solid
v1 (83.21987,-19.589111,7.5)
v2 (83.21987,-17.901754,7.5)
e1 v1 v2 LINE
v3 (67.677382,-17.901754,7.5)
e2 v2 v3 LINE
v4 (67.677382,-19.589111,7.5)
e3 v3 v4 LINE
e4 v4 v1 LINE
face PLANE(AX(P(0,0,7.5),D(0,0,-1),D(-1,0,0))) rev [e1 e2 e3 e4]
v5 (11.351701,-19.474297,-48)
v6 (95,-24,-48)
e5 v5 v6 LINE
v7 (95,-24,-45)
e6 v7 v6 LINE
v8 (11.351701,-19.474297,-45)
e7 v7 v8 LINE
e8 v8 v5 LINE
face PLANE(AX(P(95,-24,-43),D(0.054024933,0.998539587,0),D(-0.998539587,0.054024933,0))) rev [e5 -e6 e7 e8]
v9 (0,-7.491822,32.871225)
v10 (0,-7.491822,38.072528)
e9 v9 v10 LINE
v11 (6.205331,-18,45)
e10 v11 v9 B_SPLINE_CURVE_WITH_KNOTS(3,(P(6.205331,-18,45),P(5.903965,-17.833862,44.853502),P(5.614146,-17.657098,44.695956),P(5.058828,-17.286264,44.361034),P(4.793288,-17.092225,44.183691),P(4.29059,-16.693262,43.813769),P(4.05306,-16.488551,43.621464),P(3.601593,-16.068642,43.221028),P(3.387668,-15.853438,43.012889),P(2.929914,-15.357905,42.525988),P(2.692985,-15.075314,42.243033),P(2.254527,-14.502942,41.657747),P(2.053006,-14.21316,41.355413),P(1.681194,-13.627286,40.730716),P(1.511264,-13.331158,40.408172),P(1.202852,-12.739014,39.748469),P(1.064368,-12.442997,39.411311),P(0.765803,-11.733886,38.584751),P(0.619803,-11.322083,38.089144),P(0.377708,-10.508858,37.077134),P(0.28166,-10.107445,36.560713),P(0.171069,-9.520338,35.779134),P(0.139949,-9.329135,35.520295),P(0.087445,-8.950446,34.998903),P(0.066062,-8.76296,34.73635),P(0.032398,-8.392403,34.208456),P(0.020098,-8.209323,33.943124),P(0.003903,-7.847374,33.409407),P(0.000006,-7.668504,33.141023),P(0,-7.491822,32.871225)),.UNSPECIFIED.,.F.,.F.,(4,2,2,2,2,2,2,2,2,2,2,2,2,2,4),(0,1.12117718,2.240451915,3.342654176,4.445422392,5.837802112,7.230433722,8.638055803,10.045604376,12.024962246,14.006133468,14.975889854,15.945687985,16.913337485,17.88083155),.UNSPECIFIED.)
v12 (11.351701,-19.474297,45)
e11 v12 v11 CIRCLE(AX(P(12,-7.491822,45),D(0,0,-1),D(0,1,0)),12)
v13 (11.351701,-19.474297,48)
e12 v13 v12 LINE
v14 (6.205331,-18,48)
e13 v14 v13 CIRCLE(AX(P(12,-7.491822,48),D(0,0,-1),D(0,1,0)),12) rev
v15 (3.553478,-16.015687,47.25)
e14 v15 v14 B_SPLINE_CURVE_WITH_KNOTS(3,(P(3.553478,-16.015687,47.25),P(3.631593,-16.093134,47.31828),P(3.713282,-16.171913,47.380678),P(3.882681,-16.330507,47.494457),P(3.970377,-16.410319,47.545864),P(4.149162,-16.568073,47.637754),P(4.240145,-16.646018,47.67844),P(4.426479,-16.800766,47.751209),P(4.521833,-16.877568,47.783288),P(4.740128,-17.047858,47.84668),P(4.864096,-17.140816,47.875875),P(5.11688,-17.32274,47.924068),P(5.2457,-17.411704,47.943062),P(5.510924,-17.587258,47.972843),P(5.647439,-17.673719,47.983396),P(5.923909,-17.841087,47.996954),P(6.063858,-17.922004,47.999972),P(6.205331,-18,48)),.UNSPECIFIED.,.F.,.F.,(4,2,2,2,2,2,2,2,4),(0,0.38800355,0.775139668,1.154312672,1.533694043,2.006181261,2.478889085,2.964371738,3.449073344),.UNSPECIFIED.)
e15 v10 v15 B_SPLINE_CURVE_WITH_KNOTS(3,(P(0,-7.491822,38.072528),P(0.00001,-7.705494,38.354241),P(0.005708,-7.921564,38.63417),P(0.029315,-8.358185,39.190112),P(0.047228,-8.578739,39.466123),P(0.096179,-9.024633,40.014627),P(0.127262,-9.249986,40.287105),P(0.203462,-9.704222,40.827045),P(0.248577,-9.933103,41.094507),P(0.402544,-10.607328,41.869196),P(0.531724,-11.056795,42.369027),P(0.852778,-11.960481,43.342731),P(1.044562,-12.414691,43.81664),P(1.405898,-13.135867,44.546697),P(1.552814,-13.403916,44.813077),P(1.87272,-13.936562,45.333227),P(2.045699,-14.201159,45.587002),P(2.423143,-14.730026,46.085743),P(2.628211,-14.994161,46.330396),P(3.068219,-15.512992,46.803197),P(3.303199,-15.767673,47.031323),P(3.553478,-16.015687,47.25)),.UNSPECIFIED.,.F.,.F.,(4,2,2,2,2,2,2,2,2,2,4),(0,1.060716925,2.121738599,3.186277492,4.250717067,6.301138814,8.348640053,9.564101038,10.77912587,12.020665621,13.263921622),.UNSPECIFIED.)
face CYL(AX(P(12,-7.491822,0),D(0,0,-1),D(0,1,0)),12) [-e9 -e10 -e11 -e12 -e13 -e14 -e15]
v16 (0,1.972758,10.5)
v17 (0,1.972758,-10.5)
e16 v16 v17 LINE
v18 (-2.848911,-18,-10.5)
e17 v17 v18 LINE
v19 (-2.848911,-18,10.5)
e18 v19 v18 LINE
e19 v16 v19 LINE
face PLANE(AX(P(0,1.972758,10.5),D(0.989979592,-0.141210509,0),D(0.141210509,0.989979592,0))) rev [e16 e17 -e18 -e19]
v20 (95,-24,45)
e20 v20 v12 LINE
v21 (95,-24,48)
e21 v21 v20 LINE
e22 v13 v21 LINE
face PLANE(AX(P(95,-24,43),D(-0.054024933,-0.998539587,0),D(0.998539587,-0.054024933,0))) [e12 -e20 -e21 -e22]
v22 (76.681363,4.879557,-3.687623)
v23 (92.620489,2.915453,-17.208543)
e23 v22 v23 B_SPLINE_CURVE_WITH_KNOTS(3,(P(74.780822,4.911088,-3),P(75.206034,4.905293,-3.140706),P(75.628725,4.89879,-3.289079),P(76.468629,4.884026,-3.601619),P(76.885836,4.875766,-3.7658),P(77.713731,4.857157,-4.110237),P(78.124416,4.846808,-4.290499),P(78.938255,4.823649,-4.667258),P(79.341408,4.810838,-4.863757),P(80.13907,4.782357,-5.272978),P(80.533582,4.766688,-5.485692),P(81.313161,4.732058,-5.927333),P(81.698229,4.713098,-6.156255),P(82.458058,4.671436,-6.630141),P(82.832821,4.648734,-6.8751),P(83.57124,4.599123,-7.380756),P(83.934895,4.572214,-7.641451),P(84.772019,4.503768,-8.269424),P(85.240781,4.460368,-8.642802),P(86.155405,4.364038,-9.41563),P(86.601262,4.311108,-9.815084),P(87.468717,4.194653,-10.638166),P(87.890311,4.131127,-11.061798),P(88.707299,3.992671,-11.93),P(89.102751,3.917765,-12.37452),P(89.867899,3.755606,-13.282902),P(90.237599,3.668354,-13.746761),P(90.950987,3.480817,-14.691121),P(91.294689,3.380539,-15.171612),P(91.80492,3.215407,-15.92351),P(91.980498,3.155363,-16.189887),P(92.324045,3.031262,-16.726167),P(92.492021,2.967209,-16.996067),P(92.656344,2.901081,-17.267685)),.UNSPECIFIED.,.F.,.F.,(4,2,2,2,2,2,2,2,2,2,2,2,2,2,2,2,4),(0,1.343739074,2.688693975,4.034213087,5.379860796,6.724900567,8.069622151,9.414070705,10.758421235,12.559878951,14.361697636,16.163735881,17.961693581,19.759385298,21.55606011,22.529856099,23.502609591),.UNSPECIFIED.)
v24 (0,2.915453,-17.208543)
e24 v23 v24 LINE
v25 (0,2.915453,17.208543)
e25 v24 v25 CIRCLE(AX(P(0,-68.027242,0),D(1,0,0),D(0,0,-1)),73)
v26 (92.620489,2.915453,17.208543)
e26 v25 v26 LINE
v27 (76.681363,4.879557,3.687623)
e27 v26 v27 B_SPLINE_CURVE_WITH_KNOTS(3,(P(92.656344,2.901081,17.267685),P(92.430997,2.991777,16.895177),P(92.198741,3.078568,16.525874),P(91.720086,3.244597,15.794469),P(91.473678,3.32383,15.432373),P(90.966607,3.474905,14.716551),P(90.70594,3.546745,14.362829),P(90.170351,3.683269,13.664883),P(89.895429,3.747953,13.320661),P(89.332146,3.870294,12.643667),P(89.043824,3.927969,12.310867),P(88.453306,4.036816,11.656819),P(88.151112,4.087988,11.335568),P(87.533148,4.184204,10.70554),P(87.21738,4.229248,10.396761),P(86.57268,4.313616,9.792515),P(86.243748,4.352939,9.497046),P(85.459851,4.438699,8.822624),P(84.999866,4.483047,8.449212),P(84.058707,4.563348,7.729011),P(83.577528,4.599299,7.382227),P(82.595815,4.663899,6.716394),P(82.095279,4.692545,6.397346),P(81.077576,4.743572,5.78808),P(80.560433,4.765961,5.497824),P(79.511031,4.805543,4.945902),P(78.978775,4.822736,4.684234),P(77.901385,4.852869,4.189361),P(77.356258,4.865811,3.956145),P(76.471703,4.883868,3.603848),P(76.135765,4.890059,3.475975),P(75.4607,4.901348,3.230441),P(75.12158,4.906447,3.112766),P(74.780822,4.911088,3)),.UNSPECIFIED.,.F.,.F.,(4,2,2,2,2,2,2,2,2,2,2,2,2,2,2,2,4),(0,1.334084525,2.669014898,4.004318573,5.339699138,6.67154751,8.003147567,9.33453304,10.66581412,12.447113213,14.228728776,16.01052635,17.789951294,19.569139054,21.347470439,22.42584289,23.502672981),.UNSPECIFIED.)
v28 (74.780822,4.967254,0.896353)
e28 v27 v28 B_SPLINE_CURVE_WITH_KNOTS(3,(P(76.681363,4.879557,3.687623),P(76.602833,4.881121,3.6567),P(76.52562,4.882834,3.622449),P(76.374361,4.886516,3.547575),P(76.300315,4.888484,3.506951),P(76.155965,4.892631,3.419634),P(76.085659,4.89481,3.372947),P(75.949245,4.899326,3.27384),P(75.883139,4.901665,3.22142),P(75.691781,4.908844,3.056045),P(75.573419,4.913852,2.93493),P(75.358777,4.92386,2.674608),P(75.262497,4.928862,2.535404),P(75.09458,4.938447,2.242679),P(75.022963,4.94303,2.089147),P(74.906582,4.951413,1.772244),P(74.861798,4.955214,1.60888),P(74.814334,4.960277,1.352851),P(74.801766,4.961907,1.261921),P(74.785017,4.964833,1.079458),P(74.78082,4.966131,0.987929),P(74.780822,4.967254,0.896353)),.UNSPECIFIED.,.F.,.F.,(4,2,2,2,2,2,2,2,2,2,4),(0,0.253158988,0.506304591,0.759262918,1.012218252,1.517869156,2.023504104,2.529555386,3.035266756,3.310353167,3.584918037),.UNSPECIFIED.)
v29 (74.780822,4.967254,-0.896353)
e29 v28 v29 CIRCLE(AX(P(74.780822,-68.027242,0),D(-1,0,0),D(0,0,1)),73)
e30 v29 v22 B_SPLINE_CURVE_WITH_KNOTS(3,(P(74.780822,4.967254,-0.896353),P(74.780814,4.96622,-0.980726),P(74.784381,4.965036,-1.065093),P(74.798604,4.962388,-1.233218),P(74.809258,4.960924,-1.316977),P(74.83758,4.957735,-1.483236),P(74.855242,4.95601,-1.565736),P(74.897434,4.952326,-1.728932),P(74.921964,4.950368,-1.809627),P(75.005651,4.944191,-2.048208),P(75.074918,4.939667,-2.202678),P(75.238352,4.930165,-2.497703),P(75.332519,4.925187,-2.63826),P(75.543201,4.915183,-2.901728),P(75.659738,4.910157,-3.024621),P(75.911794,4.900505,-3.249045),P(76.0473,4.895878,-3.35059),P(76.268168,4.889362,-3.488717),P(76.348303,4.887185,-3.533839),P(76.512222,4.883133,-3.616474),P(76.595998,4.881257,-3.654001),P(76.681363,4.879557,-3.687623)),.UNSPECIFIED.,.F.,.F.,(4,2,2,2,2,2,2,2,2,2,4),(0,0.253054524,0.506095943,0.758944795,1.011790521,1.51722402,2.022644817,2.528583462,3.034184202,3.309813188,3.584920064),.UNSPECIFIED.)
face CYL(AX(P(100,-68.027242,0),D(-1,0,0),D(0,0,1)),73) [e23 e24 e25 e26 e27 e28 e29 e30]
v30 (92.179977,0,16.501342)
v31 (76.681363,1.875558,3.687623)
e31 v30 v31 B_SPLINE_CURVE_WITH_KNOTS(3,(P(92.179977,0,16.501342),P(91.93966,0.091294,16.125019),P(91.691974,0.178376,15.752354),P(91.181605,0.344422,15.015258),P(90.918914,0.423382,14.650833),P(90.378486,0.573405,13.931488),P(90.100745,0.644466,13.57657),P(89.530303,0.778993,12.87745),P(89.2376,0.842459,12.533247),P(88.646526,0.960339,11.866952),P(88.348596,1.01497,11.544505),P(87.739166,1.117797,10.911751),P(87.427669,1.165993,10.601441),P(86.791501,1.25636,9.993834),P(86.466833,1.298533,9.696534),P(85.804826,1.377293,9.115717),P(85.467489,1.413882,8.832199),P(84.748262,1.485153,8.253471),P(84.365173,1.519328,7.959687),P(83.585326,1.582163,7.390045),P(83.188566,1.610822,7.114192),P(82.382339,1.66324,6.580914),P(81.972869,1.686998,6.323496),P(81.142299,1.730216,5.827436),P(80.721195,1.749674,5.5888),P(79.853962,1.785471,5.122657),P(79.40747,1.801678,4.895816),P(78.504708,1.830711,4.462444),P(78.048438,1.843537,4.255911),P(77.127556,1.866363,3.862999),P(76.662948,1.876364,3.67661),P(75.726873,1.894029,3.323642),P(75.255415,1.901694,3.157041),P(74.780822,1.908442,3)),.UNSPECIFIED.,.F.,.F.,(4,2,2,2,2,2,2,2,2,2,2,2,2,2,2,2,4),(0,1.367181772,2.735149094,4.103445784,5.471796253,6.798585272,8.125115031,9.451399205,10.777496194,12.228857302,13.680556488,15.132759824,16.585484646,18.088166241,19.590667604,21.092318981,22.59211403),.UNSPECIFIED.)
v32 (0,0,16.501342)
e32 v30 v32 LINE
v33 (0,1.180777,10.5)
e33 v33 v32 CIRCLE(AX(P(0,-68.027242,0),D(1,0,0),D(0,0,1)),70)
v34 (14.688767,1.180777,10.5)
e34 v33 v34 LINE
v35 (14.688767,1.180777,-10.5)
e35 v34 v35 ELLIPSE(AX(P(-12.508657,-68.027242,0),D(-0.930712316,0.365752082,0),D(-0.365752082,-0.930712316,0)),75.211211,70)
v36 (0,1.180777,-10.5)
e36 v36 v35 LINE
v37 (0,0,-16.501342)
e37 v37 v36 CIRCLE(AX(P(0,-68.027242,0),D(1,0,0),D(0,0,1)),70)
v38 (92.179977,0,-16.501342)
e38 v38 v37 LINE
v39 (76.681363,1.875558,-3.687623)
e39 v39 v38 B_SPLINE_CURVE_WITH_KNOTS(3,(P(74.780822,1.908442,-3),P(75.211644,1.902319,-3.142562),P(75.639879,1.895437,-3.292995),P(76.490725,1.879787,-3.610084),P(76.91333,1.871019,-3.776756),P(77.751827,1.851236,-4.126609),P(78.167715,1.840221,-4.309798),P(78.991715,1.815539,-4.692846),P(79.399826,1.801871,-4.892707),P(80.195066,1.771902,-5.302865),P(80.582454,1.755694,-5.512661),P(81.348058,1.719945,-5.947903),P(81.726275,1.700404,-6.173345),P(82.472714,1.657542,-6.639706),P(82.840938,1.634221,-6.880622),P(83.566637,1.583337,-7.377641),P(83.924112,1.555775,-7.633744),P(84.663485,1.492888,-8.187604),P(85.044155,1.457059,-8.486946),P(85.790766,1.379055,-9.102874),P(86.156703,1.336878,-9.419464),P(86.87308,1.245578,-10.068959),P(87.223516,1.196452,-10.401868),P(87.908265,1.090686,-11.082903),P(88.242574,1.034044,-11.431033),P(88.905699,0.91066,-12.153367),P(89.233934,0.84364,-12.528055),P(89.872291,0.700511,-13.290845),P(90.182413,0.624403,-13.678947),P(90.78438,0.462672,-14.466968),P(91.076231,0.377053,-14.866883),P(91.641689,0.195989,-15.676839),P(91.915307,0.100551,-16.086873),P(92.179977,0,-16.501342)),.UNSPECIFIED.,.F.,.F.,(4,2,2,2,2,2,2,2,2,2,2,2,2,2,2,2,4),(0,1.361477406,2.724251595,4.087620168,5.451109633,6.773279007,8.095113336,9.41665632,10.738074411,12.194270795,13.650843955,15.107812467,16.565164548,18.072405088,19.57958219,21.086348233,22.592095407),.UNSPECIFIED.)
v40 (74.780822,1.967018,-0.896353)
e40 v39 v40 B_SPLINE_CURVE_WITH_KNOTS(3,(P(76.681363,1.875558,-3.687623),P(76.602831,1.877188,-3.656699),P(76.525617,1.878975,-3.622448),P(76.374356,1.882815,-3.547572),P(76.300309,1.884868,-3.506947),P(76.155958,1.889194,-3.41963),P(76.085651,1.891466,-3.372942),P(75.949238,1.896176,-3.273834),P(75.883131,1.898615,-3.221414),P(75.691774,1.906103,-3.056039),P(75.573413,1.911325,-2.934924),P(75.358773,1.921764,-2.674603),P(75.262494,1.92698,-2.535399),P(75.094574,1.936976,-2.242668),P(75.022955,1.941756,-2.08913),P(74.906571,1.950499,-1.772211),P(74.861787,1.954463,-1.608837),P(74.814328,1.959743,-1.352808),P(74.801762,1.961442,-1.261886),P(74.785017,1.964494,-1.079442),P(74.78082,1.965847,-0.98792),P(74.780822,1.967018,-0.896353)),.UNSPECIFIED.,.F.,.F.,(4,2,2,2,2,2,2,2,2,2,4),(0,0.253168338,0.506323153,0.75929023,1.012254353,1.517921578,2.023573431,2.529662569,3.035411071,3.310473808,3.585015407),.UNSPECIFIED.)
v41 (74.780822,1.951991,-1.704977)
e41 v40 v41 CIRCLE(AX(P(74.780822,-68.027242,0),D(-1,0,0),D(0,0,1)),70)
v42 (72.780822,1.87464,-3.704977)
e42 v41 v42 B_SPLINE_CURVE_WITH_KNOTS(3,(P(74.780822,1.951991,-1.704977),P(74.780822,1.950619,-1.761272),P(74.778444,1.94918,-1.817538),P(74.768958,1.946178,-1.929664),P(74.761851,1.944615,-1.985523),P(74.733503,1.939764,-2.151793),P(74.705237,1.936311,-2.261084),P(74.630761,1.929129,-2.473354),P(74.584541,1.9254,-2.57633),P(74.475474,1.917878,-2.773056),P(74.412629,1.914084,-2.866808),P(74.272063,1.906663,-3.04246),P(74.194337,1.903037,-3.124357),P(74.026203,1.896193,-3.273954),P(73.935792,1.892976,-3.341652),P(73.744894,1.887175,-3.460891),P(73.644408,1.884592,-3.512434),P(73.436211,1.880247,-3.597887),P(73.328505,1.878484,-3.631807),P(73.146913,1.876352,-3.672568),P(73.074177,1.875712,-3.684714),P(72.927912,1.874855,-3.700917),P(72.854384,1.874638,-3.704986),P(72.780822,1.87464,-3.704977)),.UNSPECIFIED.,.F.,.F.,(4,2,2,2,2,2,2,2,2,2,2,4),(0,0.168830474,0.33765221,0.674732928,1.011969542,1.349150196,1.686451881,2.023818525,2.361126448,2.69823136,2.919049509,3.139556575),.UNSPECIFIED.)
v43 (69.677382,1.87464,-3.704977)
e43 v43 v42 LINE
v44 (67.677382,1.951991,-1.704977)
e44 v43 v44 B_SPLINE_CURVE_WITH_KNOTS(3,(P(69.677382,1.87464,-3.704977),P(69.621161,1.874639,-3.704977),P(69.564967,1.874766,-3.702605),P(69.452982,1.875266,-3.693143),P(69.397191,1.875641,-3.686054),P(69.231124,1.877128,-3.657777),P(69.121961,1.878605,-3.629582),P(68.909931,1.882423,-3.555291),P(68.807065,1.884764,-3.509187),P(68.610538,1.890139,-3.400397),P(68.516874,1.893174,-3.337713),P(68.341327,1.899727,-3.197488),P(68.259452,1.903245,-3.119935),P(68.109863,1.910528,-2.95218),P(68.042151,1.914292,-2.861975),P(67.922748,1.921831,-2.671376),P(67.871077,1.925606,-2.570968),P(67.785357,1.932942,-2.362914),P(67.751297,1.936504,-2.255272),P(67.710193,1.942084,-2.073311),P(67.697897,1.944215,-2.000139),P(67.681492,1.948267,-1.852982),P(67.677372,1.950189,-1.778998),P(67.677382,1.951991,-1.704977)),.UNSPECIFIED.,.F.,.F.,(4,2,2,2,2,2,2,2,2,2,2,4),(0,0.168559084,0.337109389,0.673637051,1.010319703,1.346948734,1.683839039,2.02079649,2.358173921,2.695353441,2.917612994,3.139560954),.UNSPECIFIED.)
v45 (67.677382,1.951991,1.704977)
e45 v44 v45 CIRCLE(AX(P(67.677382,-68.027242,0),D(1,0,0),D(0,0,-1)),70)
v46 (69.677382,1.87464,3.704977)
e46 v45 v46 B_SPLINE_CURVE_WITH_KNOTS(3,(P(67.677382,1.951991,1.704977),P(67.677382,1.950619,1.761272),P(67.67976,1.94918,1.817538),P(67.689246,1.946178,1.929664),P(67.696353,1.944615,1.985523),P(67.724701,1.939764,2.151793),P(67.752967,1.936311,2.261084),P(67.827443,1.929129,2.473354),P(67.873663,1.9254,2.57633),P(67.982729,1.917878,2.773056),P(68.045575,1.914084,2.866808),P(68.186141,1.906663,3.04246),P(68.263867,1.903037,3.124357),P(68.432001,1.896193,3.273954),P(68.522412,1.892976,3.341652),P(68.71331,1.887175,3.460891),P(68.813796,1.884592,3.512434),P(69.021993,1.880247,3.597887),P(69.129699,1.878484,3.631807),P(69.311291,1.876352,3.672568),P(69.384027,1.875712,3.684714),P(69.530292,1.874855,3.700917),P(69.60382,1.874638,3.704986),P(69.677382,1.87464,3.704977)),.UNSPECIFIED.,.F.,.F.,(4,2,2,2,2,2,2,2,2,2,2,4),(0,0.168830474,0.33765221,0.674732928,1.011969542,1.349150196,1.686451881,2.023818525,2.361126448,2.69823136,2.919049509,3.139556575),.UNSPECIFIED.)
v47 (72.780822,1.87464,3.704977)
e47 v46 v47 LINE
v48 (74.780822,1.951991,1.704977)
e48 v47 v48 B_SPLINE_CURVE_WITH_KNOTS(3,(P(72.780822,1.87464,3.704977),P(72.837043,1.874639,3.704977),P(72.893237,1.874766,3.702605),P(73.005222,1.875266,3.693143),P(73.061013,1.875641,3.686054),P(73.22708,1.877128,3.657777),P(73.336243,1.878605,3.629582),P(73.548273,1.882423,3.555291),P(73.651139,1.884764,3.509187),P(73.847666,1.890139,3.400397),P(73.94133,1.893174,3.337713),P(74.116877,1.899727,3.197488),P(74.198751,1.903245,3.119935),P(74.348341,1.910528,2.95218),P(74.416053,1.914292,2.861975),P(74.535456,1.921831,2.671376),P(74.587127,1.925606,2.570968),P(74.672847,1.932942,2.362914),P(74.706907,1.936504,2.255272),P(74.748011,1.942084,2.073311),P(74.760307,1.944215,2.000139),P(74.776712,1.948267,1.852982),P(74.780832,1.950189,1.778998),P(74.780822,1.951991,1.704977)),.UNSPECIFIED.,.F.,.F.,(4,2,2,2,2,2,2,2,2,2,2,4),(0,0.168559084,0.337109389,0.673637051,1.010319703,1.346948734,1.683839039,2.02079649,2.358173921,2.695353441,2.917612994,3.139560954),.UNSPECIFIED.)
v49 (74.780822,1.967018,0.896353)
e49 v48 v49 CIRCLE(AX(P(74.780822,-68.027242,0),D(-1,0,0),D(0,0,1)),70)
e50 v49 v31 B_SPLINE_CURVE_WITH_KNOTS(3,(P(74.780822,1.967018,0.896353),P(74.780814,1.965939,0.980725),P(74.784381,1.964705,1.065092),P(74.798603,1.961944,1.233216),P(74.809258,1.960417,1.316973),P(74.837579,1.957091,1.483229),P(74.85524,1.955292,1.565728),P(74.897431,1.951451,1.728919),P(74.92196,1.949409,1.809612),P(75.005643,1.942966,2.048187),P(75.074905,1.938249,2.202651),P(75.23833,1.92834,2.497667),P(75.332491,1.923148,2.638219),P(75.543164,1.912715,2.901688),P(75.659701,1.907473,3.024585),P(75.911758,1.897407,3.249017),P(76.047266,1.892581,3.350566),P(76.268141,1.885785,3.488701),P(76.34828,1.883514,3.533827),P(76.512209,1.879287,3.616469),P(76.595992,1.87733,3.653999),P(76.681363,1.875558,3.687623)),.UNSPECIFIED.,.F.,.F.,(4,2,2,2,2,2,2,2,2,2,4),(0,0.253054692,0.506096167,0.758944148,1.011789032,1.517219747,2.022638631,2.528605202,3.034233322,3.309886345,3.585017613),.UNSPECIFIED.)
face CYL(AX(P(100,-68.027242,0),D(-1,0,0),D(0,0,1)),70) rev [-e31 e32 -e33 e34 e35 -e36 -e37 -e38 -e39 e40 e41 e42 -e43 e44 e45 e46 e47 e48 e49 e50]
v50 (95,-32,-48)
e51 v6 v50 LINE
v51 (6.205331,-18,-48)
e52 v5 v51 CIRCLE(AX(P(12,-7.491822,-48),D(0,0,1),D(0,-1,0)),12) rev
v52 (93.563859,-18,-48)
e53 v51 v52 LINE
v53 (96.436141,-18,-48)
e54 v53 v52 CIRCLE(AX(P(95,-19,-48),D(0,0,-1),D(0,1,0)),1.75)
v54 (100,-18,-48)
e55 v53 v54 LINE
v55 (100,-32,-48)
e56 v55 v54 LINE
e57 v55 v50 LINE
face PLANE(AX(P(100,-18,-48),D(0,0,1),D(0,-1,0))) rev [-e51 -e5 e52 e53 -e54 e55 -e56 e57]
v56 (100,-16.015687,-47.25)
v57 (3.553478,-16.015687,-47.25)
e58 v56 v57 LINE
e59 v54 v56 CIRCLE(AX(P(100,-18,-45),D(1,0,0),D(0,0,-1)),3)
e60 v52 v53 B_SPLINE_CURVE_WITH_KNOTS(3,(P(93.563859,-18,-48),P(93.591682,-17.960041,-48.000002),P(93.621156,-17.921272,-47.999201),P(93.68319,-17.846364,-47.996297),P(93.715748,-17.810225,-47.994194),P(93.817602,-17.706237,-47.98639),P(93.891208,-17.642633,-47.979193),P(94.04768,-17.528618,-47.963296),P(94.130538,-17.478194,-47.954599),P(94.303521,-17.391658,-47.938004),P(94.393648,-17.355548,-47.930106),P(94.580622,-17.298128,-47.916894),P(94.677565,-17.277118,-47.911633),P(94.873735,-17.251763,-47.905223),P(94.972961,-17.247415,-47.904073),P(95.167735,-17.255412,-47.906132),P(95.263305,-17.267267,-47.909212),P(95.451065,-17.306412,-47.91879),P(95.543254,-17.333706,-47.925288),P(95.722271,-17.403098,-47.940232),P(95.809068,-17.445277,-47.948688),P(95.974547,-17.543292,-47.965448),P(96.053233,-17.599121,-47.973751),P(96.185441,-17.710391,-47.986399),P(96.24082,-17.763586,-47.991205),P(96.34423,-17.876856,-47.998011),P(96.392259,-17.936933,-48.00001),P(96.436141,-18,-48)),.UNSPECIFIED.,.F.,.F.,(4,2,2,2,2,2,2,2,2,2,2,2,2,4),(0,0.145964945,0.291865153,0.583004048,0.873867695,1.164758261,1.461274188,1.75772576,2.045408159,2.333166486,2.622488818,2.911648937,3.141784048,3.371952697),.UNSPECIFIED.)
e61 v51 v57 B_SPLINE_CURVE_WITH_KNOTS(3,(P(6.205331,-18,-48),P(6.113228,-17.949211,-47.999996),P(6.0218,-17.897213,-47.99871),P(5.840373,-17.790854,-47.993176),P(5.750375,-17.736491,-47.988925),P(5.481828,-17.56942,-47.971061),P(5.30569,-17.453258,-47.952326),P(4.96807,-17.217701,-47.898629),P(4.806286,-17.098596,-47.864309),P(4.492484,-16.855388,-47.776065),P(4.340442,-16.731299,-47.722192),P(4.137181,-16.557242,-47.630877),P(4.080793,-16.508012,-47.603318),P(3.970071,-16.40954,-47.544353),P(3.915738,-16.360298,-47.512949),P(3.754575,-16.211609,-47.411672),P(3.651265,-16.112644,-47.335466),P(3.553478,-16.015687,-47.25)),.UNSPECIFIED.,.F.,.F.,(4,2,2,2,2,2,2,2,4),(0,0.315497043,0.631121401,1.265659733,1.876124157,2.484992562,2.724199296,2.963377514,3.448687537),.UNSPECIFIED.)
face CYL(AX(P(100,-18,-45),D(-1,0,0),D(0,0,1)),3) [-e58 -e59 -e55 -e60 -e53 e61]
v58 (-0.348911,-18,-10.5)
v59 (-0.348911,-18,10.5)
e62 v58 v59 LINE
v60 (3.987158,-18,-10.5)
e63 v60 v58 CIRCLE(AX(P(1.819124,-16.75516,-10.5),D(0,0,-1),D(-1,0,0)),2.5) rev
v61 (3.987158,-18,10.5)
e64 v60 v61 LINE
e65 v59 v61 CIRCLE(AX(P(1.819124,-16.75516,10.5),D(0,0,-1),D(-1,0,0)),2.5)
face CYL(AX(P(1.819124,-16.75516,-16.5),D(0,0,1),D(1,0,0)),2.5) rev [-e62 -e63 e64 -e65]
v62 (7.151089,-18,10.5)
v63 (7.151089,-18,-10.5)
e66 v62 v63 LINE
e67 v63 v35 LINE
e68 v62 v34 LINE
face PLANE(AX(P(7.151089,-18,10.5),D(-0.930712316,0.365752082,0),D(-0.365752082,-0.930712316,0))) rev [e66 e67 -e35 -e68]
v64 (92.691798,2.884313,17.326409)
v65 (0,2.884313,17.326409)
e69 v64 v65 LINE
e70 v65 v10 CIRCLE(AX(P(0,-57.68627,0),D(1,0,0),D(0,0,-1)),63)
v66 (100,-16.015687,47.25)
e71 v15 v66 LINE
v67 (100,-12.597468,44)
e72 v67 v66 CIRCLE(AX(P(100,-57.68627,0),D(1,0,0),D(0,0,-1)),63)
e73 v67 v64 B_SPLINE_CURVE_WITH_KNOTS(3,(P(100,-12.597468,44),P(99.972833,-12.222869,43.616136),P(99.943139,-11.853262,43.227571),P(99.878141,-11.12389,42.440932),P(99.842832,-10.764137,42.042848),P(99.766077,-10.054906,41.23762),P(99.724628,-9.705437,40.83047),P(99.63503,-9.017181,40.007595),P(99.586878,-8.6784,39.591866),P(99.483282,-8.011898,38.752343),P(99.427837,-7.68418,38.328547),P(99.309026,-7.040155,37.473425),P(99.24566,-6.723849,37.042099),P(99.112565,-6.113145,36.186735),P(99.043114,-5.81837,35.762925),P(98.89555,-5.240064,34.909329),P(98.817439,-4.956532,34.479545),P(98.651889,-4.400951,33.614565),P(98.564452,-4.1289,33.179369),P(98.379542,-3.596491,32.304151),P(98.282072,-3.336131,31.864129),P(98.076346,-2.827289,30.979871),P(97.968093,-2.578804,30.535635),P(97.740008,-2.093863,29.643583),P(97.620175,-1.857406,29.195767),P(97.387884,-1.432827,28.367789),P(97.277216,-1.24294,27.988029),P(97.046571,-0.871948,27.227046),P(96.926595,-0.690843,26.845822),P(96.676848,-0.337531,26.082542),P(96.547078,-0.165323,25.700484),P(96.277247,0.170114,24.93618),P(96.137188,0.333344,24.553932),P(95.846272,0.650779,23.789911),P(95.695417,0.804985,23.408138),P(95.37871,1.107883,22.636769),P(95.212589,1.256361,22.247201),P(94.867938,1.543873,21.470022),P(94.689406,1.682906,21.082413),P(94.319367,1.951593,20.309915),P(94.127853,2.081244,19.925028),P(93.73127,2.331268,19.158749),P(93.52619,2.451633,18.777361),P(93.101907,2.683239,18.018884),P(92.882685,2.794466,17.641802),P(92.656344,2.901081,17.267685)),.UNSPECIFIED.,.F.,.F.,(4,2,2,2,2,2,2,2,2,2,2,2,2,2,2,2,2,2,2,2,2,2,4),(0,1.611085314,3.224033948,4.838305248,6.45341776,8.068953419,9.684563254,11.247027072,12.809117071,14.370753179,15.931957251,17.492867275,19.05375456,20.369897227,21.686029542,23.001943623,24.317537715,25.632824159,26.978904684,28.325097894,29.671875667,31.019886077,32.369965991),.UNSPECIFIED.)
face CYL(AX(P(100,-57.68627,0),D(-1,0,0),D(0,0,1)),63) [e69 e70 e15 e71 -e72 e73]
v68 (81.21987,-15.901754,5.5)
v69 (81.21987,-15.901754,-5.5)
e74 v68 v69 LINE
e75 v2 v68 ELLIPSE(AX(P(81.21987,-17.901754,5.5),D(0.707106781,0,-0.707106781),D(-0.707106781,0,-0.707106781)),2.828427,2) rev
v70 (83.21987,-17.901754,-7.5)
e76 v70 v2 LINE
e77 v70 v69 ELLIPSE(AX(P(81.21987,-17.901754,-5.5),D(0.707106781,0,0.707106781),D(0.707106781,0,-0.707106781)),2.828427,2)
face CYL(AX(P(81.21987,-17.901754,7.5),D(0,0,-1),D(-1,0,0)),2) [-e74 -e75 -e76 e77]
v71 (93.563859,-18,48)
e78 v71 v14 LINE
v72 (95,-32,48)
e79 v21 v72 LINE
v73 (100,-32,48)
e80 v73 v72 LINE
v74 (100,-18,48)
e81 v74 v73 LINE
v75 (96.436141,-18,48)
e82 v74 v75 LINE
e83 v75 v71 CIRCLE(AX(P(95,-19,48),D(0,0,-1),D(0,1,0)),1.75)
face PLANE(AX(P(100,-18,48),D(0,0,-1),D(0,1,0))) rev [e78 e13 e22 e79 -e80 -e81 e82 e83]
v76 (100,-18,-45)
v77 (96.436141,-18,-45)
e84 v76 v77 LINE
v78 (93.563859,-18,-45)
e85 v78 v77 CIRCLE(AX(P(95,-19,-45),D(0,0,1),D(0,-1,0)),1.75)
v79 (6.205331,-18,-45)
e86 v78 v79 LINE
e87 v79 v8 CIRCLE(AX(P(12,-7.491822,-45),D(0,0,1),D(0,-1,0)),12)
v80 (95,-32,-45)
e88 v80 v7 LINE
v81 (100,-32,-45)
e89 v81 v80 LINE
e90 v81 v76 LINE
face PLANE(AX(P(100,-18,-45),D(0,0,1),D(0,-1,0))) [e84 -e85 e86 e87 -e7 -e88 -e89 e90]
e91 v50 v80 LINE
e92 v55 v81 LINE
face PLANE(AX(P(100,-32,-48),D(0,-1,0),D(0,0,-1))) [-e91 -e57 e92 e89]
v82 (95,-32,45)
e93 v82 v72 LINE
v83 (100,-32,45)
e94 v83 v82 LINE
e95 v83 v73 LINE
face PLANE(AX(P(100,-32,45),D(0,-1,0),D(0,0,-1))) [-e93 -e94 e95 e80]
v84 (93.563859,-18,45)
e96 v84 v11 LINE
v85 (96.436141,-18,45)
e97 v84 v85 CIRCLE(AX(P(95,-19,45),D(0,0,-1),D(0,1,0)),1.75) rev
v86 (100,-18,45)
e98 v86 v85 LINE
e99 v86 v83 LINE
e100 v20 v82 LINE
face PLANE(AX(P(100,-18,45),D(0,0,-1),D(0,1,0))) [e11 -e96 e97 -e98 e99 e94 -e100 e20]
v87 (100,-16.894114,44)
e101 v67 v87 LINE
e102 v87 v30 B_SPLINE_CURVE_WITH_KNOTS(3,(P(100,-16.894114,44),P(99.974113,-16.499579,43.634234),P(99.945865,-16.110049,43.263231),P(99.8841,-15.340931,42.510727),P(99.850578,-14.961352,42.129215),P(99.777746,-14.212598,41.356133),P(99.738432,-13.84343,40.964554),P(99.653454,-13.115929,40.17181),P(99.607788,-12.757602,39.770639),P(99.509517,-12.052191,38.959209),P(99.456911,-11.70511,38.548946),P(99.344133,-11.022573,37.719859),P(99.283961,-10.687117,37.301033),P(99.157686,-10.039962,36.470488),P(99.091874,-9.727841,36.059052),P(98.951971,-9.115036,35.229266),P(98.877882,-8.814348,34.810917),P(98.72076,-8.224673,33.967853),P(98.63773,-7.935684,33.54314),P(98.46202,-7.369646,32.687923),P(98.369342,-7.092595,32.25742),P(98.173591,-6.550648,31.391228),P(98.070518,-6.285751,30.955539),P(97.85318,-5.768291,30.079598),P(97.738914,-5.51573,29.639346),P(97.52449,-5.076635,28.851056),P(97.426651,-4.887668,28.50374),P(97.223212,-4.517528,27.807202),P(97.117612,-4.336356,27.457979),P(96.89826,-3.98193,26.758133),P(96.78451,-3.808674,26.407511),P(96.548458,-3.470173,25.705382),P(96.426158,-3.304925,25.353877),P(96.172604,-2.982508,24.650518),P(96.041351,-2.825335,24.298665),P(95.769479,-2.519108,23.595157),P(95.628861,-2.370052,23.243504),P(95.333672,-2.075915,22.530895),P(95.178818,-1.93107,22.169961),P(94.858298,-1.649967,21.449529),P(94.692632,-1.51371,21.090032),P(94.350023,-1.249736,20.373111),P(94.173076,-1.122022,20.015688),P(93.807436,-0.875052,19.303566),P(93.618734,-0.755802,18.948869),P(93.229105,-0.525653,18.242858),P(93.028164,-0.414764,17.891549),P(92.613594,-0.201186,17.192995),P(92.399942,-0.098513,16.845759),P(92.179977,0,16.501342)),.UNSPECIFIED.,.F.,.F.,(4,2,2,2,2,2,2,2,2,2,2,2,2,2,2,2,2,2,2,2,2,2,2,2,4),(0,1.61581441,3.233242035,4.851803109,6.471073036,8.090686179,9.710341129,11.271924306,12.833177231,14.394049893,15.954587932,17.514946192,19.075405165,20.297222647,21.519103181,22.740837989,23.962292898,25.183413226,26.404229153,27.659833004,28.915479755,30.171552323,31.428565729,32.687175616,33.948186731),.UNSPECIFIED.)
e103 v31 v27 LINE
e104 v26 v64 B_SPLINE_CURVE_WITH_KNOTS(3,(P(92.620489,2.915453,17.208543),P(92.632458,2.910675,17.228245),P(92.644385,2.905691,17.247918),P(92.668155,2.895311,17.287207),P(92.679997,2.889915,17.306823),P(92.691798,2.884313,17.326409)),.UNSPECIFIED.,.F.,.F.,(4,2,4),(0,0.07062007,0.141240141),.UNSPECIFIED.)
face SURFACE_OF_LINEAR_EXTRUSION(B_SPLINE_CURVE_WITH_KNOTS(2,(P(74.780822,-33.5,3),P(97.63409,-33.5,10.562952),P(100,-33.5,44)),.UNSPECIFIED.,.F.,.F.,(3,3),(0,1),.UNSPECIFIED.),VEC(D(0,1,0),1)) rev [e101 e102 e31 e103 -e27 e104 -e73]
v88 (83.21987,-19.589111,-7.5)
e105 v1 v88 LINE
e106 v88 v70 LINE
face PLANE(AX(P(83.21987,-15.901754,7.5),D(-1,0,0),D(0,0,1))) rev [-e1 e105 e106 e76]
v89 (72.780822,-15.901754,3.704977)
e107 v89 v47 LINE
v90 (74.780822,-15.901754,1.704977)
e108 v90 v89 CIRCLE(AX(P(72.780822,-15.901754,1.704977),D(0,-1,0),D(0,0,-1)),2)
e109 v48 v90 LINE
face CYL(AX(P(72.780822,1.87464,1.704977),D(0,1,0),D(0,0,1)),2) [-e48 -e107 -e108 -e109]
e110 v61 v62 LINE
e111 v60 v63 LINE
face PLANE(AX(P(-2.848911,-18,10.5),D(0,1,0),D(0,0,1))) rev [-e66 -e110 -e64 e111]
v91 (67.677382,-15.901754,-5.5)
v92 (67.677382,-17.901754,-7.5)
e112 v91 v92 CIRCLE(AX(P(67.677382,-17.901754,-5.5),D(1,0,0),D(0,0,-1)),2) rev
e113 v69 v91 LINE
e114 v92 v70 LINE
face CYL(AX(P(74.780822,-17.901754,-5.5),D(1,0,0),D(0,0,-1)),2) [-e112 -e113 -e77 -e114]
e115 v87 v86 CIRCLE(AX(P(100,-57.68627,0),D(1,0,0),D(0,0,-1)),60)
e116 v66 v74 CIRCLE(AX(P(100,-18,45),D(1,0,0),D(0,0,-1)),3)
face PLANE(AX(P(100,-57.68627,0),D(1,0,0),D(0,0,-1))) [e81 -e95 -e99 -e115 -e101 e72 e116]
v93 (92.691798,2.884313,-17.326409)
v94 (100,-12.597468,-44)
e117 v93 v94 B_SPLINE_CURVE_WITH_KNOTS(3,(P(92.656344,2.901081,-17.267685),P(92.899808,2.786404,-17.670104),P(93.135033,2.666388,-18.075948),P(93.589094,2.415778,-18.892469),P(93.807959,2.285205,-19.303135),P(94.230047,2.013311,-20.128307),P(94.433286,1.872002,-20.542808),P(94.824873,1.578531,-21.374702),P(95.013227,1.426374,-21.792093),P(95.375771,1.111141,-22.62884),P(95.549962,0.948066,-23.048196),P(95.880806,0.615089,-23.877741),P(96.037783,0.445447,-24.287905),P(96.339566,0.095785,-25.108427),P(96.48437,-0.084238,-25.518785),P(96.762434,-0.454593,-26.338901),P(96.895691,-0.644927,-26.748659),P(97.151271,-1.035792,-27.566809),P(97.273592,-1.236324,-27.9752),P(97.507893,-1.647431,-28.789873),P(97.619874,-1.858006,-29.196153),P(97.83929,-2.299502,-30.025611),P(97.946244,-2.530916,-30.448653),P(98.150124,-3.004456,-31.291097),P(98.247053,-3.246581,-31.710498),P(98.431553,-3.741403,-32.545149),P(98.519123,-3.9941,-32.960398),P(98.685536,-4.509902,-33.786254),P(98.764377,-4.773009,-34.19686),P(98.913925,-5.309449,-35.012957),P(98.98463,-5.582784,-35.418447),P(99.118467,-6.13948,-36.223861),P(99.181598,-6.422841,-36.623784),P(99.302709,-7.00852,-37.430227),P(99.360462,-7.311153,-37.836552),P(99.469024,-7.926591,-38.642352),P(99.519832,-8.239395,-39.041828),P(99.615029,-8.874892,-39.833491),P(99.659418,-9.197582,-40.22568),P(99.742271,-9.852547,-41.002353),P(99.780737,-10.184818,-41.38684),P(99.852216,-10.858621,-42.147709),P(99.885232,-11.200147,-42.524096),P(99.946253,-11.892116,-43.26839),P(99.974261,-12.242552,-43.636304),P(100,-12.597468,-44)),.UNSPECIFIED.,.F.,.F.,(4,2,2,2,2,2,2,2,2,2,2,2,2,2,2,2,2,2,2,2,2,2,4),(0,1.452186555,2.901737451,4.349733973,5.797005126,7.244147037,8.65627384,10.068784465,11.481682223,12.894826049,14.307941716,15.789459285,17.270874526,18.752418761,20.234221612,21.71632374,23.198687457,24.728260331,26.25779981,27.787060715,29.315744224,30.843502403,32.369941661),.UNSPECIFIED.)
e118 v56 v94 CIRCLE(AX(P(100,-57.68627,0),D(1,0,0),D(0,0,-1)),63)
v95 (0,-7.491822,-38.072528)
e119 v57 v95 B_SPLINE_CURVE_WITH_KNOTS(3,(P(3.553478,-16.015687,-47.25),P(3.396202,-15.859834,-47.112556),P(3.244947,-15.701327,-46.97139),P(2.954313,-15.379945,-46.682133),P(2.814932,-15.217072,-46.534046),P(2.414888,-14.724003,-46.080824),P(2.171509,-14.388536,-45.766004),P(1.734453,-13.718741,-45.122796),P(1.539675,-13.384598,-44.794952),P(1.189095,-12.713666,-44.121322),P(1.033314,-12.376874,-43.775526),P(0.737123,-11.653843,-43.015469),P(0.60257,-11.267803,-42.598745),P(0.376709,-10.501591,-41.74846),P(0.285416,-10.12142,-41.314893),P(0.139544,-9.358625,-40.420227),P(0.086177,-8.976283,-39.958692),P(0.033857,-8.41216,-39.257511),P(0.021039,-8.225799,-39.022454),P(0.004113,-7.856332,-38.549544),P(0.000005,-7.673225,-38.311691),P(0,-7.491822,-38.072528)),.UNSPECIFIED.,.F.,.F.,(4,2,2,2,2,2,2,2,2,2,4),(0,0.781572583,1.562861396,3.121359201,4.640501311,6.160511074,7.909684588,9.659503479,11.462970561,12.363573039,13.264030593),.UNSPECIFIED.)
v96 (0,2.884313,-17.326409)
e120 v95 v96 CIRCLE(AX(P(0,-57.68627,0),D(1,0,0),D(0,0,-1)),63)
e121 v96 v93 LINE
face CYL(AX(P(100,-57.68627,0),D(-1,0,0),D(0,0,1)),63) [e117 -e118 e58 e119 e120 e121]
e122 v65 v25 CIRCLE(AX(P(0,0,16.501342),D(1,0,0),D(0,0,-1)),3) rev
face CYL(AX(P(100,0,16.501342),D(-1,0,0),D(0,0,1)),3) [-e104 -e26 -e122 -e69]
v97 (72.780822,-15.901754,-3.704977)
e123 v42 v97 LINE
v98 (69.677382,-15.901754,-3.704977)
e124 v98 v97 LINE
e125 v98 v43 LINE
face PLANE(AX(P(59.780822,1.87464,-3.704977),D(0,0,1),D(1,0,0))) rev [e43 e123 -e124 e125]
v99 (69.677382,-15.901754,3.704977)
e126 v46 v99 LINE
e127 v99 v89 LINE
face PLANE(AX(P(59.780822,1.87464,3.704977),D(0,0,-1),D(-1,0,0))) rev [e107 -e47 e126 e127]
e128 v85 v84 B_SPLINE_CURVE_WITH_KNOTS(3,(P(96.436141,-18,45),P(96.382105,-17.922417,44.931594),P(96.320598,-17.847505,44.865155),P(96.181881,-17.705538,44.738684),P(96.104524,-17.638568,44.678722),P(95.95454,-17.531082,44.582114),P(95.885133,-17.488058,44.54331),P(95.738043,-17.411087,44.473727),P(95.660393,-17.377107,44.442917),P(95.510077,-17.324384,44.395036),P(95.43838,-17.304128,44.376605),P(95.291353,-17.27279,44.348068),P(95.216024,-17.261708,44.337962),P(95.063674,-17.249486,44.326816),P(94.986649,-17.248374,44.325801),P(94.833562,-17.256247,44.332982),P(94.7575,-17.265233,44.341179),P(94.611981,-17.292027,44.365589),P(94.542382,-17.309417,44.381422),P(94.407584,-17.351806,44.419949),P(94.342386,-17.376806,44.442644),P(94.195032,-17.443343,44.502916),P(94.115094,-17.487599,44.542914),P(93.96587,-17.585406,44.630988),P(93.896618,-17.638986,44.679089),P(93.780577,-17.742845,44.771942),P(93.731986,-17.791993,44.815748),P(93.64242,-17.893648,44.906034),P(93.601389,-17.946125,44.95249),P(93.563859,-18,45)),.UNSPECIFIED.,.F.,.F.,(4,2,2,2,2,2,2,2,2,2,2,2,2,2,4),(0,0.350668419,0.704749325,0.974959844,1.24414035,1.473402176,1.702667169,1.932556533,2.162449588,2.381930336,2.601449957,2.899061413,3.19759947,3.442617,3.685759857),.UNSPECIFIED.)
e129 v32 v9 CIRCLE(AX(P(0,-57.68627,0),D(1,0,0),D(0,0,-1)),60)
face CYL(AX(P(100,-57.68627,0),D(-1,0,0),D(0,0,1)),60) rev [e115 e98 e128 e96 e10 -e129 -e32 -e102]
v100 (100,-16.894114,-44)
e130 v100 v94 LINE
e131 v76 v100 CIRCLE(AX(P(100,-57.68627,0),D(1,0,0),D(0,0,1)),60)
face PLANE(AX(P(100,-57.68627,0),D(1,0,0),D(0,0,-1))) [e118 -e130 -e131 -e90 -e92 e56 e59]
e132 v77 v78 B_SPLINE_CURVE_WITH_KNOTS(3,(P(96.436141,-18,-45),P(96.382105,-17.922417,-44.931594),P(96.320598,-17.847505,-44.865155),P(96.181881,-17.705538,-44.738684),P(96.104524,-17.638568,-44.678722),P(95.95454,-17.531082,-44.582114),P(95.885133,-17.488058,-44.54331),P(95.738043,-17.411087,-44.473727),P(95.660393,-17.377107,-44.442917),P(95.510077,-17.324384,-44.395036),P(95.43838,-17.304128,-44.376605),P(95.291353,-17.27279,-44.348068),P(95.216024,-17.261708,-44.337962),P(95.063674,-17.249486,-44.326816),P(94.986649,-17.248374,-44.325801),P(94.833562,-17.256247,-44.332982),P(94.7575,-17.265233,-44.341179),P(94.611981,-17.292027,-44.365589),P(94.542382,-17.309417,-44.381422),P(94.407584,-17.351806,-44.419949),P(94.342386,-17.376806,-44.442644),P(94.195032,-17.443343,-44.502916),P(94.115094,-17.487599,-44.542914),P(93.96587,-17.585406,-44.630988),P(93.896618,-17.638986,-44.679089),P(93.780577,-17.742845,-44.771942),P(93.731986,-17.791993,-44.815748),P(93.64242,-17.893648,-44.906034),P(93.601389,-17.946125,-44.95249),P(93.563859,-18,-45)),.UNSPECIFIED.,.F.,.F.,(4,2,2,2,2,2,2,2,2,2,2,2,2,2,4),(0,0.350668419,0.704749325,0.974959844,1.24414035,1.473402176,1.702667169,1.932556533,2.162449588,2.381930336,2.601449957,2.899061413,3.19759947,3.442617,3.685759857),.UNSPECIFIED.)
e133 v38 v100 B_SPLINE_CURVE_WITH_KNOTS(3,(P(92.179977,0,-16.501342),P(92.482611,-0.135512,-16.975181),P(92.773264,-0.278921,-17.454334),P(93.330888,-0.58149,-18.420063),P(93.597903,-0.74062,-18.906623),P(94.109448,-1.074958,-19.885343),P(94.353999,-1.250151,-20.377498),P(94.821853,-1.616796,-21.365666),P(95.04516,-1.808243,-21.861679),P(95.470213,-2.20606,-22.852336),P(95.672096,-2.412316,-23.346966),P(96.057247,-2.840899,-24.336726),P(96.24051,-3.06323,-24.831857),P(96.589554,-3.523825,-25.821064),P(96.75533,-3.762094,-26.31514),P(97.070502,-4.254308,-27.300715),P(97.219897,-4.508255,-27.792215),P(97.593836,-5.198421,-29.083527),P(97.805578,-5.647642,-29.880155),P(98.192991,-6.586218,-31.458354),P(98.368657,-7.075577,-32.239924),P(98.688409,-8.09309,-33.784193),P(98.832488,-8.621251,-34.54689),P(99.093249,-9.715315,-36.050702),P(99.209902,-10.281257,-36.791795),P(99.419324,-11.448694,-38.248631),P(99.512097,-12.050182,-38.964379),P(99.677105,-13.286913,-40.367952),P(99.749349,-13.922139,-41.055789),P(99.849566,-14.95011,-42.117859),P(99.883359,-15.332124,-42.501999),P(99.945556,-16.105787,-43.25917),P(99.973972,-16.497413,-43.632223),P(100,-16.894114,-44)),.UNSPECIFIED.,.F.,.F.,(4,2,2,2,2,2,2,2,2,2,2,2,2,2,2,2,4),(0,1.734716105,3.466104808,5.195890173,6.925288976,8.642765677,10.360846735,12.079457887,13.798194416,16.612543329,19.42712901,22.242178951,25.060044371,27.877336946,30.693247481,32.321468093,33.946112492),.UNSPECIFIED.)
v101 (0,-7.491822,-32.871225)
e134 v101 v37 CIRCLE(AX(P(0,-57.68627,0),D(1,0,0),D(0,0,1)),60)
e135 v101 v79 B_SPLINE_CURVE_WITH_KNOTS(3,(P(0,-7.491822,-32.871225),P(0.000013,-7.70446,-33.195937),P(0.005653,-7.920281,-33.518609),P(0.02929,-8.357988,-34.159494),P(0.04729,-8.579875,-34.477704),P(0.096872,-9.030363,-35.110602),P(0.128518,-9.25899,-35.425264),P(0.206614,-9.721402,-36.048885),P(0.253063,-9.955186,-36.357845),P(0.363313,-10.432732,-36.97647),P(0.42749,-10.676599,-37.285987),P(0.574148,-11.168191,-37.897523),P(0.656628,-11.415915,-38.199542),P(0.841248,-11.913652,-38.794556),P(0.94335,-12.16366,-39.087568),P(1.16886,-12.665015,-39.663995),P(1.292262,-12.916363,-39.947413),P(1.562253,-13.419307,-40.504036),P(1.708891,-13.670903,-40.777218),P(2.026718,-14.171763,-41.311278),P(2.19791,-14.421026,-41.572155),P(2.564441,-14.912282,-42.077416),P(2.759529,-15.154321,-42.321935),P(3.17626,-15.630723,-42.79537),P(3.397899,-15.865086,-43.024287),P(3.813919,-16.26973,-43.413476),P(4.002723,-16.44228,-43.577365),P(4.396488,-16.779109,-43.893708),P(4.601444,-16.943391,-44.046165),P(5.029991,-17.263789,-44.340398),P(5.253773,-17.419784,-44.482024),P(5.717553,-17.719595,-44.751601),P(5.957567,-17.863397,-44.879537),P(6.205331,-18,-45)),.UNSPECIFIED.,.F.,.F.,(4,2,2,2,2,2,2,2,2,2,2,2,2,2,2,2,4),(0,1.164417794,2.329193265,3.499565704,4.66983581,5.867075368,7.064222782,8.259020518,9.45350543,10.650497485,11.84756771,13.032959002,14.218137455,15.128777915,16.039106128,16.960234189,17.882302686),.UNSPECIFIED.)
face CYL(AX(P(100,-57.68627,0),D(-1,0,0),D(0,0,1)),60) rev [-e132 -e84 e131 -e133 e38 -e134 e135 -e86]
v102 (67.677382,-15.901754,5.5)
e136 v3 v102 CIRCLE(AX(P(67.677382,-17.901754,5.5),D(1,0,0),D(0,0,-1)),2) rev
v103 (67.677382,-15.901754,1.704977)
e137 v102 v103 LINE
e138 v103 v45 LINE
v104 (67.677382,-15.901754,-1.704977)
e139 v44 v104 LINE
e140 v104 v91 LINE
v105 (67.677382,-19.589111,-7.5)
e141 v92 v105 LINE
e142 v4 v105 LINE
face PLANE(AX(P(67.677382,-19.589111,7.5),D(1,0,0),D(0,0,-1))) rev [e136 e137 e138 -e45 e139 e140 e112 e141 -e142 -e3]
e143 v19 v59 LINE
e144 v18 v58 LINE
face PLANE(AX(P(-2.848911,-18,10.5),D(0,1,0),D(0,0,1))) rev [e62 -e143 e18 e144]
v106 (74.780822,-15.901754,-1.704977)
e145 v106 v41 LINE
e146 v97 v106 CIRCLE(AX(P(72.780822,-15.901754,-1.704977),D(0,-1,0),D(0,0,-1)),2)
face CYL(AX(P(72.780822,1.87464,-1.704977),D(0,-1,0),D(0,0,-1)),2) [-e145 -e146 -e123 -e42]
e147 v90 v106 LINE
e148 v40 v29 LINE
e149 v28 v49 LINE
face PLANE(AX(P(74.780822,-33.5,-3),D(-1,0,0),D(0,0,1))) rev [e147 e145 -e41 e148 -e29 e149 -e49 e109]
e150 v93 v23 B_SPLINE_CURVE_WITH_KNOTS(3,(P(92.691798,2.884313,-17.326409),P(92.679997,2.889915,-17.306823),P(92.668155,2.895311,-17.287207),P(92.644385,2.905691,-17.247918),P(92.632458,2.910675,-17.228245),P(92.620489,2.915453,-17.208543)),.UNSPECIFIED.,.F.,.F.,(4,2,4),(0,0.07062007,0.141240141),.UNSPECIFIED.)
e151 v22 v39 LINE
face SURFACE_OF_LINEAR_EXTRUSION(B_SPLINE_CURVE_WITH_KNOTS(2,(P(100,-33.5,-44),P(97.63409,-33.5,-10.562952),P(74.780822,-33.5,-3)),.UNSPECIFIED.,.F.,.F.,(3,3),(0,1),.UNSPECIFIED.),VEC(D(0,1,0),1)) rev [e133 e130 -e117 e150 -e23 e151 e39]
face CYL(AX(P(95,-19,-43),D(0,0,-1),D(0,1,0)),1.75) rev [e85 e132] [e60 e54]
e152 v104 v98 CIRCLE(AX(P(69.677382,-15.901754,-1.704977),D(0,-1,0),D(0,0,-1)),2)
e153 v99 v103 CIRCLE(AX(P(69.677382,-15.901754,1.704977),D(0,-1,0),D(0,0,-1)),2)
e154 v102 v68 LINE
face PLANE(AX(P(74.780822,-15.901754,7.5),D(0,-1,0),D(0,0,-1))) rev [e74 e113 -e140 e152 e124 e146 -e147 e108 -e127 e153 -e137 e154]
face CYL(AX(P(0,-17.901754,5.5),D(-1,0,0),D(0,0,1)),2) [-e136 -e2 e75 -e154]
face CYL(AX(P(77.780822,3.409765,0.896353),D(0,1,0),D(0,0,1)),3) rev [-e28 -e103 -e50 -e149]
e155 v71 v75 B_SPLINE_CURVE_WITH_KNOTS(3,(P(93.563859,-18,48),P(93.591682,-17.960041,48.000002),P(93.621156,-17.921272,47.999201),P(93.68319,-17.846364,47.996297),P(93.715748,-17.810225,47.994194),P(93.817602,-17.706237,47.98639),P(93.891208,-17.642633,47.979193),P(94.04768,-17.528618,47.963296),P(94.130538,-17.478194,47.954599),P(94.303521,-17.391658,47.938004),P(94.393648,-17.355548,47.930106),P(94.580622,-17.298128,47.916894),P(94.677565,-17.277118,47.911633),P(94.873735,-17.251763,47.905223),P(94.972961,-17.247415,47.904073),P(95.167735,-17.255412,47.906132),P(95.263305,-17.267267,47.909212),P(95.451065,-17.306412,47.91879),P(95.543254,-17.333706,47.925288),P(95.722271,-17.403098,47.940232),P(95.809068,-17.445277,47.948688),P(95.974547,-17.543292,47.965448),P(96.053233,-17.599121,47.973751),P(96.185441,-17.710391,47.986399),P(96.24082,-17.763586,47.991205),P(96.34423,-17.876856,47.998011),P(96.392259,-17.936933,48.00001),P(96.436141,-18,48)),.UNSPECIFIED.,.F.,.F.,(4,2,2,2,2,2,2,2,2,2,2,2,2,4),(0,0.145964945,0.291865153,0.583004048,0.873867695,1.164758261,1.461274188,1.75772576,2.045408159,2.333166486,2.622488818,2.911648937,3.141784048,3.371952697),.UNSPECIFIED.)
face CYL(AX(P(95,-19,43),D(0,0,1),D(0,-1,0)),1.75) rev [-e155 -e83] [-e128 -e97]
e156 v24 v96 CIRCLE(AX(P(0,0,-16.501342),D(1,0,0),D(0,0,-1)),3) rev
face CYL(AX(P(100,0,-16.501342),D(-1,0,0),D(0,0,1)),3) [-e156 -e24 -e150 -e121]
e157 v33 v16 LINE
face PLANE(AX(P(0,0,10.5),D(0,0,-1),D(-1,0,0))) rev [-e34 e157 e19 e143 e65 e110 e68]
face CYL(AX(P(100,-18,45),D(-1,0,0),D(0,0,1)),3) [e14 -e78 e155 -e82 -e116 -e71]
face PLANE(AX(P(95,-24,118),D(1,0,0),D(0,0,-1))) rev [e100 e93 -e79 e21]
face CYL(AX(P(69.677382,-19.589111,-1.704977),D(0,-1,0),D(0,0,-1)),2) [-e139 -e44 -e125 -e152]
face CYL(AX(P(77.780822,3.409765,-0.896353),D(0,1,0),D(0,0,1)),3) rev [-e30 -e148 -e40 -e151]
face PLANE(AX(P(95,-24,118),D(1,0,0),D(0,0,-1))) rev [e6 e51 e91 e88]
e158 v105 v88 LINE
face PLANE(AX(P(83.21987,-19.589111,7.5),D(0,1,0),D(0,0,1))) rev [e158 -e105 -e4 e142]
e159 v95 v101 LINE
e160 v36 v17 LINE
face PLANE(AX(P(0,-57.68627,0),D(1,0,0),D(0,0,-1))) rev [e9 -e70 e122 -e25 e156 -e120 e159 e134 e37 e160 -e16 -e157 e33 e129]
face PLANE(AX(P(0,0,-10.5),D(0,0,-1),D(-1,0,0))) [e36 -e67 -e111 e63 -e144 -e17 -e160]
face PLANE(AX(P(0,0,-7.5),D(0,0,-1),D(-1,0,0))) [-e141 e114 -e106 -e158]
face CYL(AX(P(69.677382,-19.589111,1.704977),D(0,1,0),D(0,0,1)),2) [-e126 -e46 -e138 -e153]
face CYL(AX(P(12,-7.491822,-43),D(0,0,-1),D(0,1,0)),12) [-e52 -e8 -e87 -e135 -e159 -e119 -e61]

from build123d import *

# Parameters (mm, degrees)
EXTRUDE_THIN1_DEPTH = 100
CUT_EXTRUDE2_DEPTH  = 33.5
FILLET1_R           = 3
SKETCH6_W           = 108.67085681690114
SKETCH6_H           = 17.87977423217149
CUT_EXTRUDE3_DEPTH  = 166
BOSS_EXTRUDE1_DEPTH = 10.5
CUT_EXTRUDE4_DEPTH  = 27.00000000000001
SKETCH11_R          = 1.749999999999997
CUT_EXTRUDE5_DEPTH  = 5
BOSS_EXTRUDE2_DEPTH = 7.500000000000001
CUT_EXTRUDE6_START  = -15.000000000000002
CUT_EXTRUDE6_DEPTH  = 15.000000000000002
FILLET3_R           = 2
CUT_EXTRUDE7_DEPTH  = 5.000000000000001
FILLET5_R           = 12


with BuildPart() as part:
    # Sketch1 → Extrude-Thin1 (new body)
    with BuildSketch(Plane(origin=(0, 0, 0), x_dir=(0, 0, -1), z_dir=(1, 0, 0))):
        with BuildLine():
            Line((44.99999999999999, -32), (45, -18.000000000000004))
            ThreePointArc((45, -18.000000000000004), (32.040658090715816, -6.957616725901104), (16.501342127994352, -3.94e-15))
            ThreePointArc((16.501342127994352, -3.94e-15), (-9.68e-15, 1.9727576042150758), (-16.501342127994352, 2.58e-15))
            ThreePointArc((-16.501342127994352, 2.58e-15), (-32.040658090715816, -6.957616725901083), (-45, -17.99999999999999))
            Line((-45, -17.99999999999999), (-45.00000000000001, -31.999999999999986))
            Line((-45.00000000000001, -31.999999999999986), (-48.00000000000001, -31.999999999999986))
            Line((-48.00000000000001, -31.999999999999986), (-48, -16.881858139762553))
            ThreePointArc((-48, -16.881858139762553), (-34.09998293164343, -4.712774745757805), (-17.2676846598946, 2.901081047578947))
            ThreePointArc((-17.2676846598946, 2.901081047578947), (-9.055e-14, 4.972757604215076), (17.26768465989443, 2.901081047578978))
            ThreePointArc((17.26768465989443, 2.901081047578978), (34.099982931643346, -4.71277474575777), (48, -16.881858139762553))
            Line((48, -16.881858139762553), (47.99999999999999, -32))
            Line((47.99999999999999, -32), (44.99999999999999, -32))
        make_face()
    extrude(amount=EXTRUDE_THIN1_DEPTH)

    # Sketch5 → Cut-Extrude2 (cut, symmetric)
    with BuildSketch(Plane(origin=(0, 0, 0), x_dir=(1, 0, 0), z_dir=(0, 1, 0))):
        with BuildLine():
            Line((74.78082212000585, 2.9999999999999996), (74.78082212000585, -3.0000000000000004))
            add(Edge.make_bspline(
                [(74.78082212000585, -3.0000000000000004), (97.6340902919286, -10.562952056895462), (100, -44)],
                knots=[0, 0, 0, 1, 1, 1], degree=2))
            Line((100, -44), (100, 44))
            add(Edge.make_bspline(
                [(74.78082212000585, 2.9999999999999996), (97.6340902919286, 10.562952056895462), (100, 44)],
                knots=[0, 0, 0, 1, 1, 1], degree=2))
        make_face()
    extrude(amount=CUT_EXTRUDE2_DEPTH, both=True, mode=Mode.SUBTRACT)

    # Fillet1
    fillet1_edges = [part.edges().sort_by_distance(p)[0] for p in [
        (50, -16.881858139762556, -48),
        (50, -16.88185813976255, 48),
        (74.78082212000585, 3.4097650316477264, 3.0000000000000004),
        (74.78082212000585, 3.4097650316477246, -2.9999999999999996),
        (46.32817175668929, 2.9010810475789732, -17.267684659894428),
        (46.328171756689336, 2.9010810475789484, 17.267684659894588),
    ]]
    fillet(fillet1_edges, radius=FILLET1_R)

    # Sketch6 → Cut-Extrude3 (cut)
    with BuildSketch(Plane(origin=(0, -2.379e-14, -48.00000000000001), x_dir=(-1, 0, 0), z_dir=(0, -5e-16, -1))):
        with Locations((-40.66457159154943, -32.93988711608573)):
            Rectangle(SKETCH6_W, SKETCH6_H)
    extrude(amount=-CUT_EXTRUDE3_DEPTH, mode=Mode.SUBTRACT)

    # Sketch8 → Boss-Extrude1 (add, symmetric)
    with BuildSketch(Plane.XY):
        Polygon((0, 1.9727576042150723), (-2.8489105039621805, -17.99999999999999), (7.1510894960378195, -17.99999999999999), (15, 1.972757604215074), align=None)
    extrude(amount=BOSS_EXTRUDE1_DEPTH, both=True)

    # Sketch10 → Cut-Extrude4 (cut)
    with BuildSketch(Plane.XY.offset(10.5)):
        with BuildLine():
            Line((-0.3489105039621806, -17.99999999999999), (3.9871579959635945, -17.99999999999999))
            ThreePointArc((3.9871579959635945, -17.99999999999999), (1.8191237460007066, -14.255159652410038), (-0.3489105039621806, -17.99999999999999))
        make_face()
    extrude(amount=-CUT_EXTRUDE4_DEPTH, mode=Mode.SUBTRACT)

    # Sketch11 → Cut-Extrude5 (cut)
    with BuildSketch(Plane(origin=(0, -2.379e-14, -48.00000000000001), x_dir=(-1, 0, 0), z_dir=(0, -5e-16, -1))):
        with Locations(Location((-95, -18.99999999999998, 0), (0, 0, 34.849904579))):
            Circle(SKETCH11_R)
    cut_extrude5 = extrude(amount=-CUT_EXTRUDE5_DEPTH, mode=Mode.SUBTRACT)

    # Mirror1: Cut-Extrude5 across plane
    add(cut_extrude5.mirror(Plane.XY), mode=Mode.SUBTRACT)

    # Sketch12 → Boss-Extrude2 (add, symmetric)
    with BuildSketch(Plane.XY):
        Polygon((74.78082212000585, 1.9727576042150723), (74.78082212000585, -15.901753636370586), (83.21987044067507, -15.901753636370586), (83.21987044067507, -19.589110757152636), (67.6773818593807, -19.589110757152636), (67.6773818593807, 1.9727576042150723), align=None)
    extrude(amount=BOSS_EXTRUDE2_DEPTH, both=True)

    # Sketch13 → Cut-Extrude6 (cut)
    with BuildSketch(Plane(origin=(74.78082212000585, 0, 0), x_dir=(0, 0, -1), z_dir=(1, 0, 0)).offset(CUT_EXTRUDE6_START)):
        with BuildLine():
            Line((-7.500000000000001, 1.569812139590343), (-7.499999999999999, -15.901753636370586))
            Line((-7.499999999999999, -15.901753636370586), (-3.7049771024193907, -15.901753636370586))
            Line((-3.7049771024193907, -15.901753636370586), (-3.7049771024193907, 1.8746398726529334))
            ThreePointArc((-3.7049771024193907, 1.8746398726529334), (-5.604561352429517, 1.748031821138369), (-7.500000000000001, 1.569812139590343))
        make_face()
        with BuildLine():
            Line((7.499999999999999, -15.901753636370586), (3.7049771024193907, -15.901753636370586))
            Line((3.7049771024193907, -15.901753636370586), (3.7049771024193907, 1.8746398726529334))
            ThreePointArc((3.7049771024193907, 1.8746398726529334), (5.6045613524295295, 1.7480318211384258), (7.500000000000001, 1.569812139590343))
            Line((7.500000000000001, 1.569812139590343), (7.499999999999999, -15.901753636370586))
        make_face()
    extrude(amount=CUT_EXTRUDE6_DEPTH, mode=Mode.SUBTRACT)

    # Fillet3
    fillet3_edges = [part.edges().sort_by_distance(p)[0] for p in [
        (75.44862615002788, -15.901753636370586, -7.5),
        (83.21987044067507, -15.901753636370586, 0),
        (75.44862615002788, -15.901753636370586, 7.5),
        (67.6773818593807, -7.013556881858825, -3.7049771024193907),
        (67.6773818593807, -7.013556881858825, 3.7049771024193907),
        (74.78082212000585, -7.013556881858825, 3.7049771024193907),
        (74.78082212000585, -7.013556881858825, -3.7049771024193907),
    ]]
    fillet(fillet3_edges, radius=FILLET3_R)

    # Sketch15 → Cut-Extrude7 (cut)
    with BuildSketch(Plane(origin=(0, -2.379e-14, -48.00000000000001), x_dir=(-1, 0, 0), z_dir=(0, -5e-16, -1))):
        Polygon((-95, -23.99999999999998), (0, -18.860125054588586), (0, -26.572046869734645), align=None)
    cut_extrude7 = extrude(amount=-CUT_EXTRUDE7_DEPTH, mode=Mode.SUBTRACT)

    # Mirror2: Cut-Extrude7 across plane
    add(cut_extrude7.mirror(Plane.XY), mode=Mode.SUBTRACT)

    # Fillet5
    # the kernel refuses this fillet: 12 mm, written as the material it takes off along each edge
    with BuildSketch(Plane(origin=(0, -18.860125054588625, 76.42075806632201), x_dir=(0, 1, 5e-16), z_dir=(0, 5e-16, -1))) as fillet5_piece_1:
        with BuildLine():
            CenterArc((FILLET5_R * 0.947358602211, FILLET5_R), FILLET5_R, 183.09690836649892, 86.90309163350105)
            Line((-FILLET5_R * 0.0511809847104, FILLET5_R * 0.945975067318), (0, 0))
            Line((0, 0), (FILLET5_R * 0.947358602211, 0))
        make_face()
    extrude(amount=59.841516132644024, mode=Mode.SUBTRACT)
    with BuildSketch(Plane(origin=(0, -18.860125054588625, -76.42075806632201), x_dir=(0, 1, -5e-16), z_dir=(0, 5e-16, 1))) as fillet5_piece_2:
        with BuildLine():
            CenterArc((FILLET5_R * 0.947358602211, -FILLET5_R), FILLET5_R, 90, 86.90309163350108)
            Line((-FILLET5_R * 0.0511809847104, -FILLET5_R * 0.945975067318), (0, 0))
            Line((0, 0), (FILLET5_R * 0.947358602211, 0))
        make_face()
    extrude(amount=59.841516132644024, mode=Mode.SUBTRACT)


solid = part.part
